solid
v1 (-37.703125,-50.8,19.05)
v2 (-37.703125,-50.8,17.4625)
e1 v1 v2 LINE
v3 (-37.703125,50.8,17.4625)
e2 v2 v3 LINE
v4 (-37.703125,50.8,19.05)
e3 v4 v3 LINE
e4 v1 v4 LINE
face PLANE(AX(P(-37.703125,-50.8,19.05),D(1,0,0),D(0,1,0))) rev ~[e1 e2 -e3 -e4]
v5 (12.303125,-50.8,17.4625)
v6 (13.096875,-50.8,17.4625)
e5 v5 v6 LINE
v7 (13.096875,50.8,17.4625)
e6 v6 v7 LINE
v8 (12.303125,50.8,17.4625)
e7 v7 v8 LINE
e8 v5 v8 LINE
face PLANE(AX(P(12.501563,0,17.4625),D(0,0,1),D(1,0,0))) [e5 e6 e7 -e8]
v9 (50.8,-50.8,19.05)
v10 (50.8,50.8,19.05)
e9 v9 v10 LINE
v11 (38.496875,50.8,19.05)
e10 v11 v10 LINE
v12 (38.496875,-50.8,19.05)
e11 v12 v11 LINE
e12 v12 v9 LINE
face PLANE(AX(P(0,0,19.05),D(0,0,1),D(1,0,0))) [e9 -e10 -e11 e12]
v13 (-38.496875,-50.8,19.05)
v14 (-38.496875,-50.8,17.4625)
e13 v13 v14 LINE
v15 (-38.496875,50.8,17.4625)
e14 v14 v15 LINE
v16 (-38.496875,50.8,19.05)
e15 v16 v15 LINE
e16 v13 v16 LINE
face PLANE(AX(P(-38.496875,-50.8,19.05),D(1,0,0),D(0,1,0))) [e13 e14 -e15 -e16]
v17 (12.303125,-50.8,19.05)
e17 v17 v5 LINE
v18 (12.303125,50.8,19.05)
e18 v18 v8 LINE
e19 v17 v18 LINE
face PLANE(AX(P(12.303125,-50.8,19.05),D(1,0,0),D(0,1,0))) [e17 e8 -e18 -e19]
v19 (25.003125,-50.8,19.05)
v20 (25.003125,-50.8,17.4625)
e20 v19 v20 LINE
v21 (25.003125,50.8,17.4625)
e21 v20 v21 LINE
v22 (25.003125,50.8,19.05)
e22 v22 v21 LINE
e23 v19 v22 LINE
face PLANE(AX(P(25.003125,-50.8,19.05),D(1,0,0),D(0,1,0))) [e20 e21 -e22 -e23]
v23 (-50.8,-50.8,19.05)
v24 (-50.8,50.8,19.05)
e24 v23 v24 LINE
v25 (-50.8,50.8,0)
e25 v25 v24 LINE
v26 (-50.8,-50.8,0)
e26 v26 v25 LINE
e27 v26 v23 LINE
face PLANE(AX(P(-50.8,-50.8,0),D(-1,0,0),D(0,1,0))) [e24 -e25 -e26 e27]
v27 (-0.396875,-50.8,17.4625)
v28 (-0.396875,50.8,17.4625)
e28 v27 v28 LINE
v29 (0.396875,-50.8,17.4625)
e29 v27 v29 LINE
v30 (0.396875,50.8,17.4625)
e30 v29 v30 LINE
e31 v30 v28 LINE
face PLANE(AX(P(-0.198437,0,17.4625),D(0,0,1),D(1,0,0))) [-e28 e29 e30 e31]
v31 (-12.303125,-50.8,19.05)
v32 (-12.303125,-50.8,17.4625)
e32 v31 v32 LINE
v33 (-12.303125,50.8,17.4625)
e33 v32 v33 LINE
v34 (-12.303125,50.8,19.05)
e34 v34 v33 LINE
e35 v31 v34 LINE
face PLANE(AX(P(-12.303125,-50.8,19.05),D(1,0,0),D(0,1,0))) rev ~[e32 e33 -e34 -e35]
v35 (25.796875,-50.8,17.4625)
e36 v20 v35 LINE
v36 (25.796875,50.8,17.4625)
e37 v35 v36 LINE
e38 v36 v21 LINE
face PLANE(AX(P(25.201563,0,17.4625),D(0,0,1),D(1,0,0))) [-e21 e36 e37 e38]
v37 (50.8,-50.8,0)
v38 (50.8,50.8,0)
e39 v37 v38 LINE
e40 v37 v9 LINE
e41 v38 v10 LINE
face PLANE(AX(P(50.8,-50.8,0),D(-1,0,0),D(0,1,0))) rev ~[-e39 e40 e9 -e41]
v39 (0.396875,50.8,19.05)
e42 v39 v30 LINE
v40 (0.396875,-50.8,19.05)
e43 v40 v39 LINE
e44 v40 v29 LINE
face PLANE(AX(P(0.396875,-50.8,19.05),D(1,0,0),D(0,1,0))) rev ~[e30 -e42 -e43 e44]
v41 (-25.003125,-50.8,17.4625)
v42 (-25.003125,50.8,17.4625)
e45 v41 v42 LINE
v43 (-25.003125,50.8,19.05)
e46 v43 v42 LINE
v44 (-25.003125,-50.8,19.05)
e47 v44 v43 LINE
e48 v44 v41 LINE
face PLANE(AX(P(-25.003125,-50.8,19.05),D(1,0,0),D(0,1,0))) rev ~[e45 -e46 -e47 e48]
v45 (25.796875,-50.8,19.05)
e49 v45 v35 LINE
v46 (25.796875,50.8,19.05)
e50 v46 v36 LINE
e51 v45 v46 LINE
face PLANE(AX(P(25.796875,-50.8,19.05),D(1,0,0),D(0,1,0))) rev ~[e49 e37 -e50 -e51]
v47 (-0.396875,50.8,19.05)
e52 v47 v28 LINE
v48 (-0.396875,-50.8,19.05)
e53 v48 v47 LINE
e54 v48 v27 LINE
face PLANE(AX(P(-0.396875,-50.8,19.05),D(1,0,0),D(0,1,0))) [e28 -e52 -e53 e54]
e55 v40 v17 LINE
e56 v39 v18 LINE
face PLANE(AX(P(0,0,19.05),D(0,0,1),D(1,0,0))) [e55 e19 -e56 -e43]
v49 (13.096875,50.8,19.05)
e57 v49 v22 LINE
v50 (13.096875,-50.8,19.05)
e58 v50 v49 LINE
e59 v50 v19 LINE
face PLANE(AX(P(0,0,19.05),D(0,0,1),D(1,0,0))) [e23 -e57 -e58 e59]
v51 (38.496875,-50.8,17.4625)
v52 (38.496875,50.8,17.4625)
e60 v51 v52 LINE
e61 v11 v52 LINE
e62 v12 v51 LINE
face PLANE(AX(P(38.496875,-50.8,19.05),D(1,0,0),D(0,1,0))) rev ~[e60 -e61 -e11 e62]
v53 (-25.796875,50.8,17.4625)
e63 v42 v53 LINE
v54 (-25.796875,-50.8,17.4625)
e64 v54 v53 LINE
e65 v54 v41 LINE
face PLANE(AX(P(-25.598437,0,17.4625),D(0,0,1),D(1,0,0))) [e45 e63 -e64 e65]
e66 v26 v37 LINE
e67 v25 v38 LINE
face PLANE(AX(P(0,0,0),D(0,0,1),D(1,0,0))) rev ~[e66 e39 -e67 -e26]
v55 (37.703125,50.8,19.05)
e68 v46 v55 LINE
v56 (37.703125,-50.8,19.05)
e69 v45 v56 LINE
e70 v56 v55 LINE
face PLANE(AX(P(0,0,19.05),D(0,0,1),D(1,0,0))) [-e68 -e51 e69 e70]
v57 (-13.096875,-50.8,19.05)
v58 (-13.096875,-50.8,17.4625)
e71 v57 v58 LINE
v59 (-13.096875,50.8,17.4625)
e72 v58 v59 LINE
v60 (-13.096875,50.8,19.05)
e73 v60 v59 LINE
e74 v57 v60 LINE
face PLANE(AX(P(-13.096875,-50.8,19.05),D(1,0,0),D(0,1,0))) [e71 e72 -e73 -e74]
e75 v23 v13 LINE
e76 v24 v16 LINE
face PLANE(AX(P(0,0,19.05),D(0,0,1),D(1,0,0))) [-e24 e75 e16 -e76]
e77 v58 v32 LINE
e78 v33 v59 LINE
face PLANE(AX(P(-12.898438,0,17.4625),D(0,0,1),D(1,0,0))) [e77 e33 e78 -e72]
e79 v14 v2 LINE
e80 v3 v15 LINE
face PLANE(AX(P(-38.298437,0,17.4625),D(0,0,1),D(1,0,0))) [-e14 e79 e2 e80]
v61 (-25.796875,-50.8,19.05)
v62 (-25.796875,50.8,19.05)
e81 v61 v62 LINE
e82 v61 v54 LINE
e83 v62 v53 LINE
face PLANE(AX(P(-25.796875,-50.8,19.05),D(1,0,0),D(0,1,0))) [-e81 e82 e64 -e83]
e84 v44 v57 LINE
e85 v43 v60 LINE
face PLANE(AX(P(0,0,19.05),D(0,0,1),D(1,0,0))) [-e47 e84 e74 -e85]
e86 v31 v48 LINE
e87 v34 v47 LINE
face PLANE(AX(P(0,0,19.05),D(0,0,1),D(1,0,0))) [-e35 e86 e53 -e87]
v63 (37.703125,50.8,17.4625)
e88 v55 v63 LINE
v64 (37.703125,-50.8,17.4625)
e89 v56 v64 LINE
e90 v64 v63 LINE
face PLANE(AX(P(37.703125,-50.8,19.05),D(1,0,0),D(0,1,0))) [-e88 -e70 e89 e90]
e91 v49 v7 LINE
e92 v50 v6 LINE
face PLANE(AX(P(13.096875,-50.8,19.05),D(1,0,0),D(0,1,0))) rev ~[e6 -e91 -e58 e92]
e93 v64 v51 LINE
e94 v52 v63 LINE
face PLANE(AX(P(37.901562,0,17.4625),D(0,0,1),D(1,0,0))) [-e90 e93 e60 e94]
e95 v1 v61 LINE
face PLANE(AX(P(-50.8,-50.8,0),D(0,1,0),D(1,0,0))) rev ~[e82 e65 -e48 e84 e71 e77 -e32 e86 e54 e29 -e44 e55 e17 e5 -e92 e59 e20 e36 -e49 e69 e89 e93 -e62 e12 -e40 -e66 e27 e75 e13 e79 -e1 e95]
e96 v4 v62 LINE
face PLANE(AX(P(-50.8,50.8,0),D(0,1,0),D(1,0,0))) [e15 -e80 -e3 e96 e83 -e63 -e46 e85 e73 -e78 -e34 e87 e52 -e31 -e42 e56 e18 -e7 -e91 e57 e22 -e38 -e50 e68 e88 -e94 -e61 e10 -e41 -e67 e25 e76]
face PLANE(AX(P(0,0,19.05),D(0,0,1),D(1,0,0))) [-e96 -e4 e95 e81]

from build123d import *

# Parameters (mm, degrees)
F0_W     = 101.6
F0_H     = 101.6
F1_DEPTH = 19.05
F2_W     = 0.396875
F2_H     = 101.6
F3_DEPTH = 1.5875


# Not quite as in the source:
# - a length typed as a fraction of an inch, garbled in the dataset ("3 / 203.2 mm" for 3/8 in), is restored


with BuildPart() as f1:
    # F0 (on Top) → F1 (new body)
    with BuildSketch(Plane.XY):
        Rectangle(F0_W, F0_H)
    extrude(amount=F1_DEPTH)

    # F2 (on face) → F3 (cut)
    with BuildSketch(Plane.XY.offset(19.05)):
        with Locations((-38.2984375, 0)):
            Rectangle(F2_W, F2_H)
        with Locations((-37.9015625, 0)):
            Rectangle(F2_W, F2_H)
        with Locations((-25.5984375, 0)):
            Rectangle(F2_W, F2_H)
        with Locations((-25.2015625, 0)):
            Rectangle(F2_W, F2_H)
        with Locations((-12.8984375, 0)):
            Rectangle(F2_W, F2_H)
        with Locations((-12.5015625, 0)):
            Rectangle(F2_W, F2_H)
        with Locations((-0.1984375, 0)):
            Rectangle(F2_W, F2_H)
        with Locations((0.1984375, 0)):
            Rectangle(F2_W, F2_H)
        with Locations((12.5015625, 0)):
            Rectangle(F2_W, F2_H)
        with Locations((12.8984375, 0)):
            Rectangle(F2_W, F2_H)
        with Locations((25.2015625, 0)):
            Rectangle(F2_W, F2_H)
        with Locations((25.5984375, 0)):
            Rectangle(F2_W, F2_H)
        with Locations((37.9015625, 0)):
            Rectangle(F2_W, F2_H)
        with Locations((38.2984375, 0)):
            Rectangle(F2_W, F2_H)
    extrude(amount=-F3_DEPTH, mode=Mode.SUBTRACT)


solid = f1.part
